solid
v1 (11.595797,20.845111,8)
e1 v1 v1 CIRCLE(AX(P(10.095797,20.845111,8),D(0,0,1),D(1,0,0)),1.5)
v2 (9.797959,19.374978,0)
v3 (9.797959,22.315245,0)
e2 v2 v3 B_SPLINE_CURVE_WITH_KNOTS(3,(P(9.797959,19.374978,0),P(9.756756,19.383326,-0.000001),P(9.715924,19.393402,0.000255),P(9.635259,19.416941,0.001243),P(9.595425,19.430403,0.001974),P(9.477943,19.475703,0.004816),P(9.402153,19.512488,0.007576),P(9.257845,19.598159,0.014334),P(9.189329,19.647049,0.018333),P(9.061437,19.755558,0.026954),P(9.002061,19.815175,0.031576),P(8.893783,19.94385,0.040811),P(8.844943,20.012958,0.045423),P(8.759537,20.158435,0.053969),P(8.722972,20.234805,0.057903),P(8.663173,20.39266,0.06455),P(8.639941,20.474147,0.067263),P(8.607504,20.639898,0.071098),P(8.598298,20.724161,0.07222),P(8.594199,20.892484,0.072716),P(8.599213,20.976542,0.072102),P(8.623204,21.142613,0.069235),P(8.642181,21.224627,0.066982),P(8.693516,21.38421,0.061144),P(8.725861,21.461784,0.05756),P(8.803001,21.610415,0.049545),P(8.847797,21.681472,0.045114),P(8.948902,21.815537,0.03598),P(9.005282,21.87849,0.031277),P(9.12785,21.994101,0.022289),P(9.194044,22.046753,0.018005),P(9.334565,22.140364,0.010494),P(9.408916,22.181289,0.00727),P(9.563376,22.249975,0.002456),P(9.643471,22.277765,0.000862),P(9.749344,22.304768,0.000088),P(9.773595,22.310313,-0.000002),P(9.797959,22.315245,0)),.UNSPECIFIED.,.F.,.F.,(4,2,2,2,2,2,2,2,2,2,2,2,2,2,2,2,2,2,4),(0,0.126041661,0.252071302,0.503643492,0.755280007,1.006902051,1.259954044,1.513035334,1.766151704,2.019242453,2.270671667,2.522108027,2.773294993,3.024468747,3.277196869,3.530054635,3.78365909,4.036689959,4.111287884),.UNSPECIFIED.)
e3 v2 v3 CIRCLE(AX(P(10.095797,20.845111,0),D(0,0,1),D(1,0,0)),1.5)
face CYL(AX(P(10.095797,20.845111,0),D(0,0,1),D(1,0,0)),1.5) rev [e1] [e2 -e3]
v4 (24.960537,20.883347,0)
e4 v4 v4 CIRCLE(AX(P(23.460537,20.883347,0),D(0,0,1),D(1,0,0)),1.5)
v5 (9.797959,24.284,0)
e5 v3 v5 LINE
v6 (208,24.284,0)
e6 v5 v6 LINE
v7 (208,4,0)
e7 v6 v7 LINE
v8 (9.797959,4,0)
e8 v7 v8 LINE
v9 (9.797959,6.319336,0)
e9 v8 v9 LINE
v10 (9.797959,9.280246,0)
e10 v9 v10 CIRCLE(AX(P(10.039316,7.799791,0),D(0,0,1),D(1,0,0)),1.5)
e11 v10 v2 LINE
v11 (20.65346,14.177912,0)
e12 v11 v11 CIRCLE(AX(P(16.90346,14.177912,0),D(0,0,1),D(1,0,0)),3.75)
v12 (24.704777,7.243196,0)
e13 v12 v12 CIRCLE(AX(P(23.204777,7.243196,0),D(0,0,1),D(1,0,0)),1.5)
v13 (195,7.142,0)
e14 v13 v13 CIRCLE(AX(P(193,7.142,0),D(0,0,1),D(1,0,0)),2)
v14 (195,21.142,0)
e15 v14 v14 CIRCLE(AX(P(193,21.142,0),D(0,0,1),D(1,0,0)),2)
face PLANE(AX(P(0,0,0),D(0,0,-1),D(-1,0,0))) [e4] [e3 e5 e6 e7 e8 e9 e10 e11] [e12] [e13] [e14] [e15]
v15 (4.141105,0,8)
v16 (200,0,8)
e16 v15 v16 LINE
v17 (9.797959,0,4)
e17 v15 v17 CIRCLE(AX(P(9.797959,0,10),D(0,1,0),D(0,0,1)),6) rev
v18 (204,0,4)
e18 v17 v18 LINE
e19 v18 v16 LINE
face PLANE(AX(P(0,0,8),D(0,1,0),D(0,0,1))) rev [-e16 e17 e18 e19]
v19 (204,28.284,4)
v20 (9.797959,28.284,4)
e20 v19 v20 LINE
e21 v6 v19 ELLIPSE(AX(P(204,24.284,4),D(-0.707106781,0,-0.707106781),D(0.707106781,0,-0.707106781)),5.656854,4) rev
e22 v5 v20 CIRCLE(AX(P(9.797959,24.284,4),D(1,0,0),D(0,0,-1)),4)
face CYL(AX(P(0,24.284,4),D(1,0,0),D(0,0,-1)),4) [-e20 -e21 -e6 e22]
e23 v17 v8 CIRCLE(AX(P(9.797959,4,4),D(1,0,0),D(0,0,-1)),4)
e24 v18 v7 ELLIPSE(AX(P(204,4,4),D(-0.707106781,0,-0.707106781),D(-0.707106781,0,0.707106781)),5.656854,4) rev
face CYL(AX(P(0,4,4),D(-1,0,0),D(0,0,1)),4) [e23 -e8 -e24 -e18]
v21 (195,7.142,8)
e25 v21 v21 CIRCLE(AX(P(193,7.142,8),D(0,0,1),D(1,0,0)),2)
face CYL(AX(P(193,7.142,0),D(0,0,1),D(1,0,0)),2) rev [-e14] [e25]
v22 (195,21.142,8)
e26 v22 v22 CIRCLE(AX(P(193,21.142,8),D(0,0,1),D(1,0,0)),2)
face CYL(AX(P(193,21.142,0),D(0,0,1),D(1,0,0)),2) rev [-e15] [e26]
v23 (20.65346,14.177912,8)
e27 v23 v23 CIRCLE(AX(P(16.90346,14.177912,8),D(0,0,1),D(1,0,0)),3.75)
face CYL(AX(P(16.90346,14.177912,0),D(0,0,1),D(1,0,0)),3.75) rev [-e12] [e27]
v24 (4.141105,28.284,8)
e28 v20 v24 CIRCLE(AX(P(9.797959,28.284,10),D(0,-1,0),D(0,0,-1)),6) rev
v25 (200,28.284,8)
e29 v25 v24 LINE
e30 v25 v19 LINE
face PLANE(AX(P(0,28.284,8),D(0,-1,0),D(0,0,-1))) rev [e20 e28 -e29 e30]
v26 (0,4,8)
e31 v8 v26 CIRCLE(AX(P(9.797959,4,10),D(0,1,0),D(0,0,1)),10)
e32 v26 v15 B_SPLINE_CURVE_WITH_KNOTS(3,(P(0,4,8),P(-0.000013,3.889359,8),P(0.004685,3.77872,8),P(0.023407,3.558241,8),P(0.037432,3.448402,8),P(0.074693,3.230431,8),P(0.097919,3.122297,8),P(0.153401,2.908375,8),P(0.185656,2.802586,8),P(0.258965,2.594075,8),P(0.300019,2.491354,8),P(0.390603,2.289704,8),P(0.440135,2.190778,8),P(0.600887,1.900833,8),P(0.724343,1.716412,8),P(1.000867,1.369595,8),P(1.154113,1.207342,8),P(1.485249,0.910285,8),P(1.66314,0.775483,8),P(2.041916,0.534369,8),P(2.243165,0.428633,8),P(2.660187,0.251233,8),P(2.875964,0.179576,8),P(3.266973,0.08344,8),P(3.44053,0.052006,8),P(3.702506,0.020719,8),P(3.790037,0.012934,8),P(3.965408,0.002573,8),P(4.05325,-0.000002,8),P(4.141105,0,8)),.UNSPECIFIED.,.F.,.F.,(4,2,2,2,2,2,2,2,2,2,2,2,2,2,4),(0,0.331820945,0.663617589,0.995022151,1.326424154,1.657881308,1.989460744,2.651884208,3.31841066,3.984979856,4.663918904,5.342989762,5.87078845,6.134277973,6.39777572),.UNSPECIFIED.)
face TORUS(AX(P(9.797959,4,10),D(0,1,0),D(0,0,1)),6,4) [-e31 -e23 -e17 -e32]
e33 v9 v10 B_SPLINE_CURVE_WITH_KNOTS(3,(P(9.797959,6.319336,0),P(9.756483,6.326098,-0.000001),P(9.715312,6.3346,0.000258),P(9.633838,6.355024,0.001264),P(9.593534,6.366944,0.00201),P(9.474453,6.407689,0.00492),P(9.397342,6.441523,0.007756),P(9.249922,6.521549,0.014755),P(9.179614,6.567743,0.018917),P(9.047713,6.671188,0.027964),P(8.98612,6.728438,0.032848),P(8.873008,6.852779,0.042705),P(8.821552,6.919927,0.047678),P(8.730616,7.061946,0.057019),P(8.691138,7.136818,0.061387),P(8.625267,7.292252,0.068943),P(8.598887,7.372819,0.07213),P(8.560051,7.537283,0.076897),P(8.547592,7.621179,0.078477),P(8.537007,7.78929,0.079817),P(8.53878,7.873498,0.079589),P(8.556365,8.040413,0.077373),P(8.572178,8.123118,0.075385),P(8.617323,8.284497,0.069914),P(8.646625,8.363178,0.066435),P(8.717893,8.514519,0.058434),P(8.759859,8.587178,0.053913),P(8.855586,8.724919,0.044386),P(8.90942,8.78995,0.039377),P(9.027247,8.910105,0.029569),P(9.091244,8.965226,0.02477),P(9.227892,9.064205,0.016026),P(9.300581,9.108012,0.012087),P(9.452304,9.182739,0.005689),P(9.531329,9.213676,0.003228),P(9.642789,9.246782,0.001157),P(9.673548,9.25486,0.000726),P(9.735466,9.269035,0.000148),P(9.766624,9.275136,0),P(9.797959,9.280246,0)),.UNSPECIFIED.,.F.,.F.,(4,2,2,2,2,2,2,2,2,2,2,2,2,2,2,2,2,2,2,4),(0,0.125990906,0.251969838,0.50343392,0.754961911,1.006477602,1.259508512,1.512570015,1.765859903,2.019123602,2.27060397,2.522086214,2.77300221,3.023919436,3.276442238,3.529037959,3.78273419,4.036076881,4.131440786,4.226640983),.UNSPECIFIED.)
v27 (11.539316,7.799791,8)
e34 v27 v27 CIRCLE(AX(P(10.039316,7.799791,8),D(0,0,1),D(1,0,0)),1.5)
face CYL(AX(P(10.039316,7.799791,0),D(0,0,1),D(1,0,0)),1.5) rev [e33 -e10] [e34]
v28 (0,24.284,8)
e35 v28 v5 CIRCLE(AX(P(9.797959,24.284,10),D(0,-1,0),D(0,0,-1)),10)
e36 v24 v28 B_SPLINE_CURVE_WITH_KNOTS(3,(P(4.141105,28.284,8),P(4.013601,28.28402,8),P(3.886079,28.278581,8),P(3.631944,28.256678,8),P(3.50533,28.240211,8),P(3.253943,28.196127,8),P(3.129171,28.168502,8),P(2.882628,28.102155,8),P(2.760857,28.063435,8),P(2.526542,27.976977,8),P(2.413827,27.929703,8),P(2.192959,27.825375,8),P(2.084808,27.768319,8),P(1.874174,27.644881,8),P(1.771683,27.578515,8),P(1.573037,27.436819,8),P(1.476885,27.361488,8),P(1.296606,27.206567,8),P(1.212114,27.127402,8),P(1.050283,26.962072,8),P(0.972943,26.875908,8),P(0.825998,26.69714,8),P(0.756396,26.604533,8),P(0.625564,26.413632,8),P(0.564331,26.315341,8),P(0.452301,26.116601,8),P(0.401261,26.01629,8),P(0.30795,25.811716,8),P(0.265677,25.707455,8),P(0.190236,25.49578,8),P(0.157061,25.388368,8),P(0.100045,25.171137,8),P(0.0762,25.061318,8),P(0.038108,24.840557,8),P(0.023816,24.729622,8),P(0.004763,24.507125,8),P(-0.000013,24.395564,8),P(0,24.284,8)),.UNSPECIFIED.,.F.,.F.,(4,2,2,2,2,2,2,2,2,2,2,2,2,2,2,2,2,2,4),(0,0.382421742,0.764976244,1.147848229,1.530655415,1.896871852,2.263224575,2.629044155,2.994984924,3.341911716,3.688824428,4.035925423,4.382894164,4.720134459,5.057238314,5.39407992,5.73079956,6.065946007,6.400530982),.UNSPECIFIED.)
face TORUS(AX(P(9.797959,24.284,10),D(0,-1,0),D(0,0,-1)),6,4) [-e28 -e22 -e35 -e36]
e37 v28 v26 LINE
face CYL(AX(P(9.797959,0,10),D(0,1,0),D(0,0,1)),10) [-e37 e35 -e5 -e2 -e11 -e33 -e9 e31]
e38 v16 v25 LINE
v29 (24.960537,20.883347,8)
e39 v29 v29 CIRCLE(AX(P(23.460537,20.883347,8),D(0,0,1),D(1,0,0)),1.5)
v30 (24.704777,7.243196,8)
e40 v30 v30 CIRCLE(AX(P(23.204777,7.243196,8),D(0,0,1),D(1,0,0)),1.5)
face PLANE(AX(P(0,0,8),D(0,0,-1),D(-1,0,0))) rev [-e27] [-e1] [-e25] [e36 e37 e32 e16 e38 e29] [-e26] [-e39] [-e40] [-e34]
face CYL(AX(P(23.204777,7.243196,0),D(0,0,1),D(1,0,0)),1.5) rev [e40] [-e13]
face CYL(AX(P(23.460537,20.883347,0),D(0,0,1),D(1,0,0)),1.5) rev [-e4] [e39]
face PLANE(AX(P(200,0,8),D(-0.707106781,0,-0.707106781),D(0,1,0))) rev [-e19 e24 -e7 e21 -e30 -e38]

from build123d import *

# Parameters (mm, degrees)
ESQUISSE1_W             = 220
ESQUISSE1_H             = 28.284
BOSS_EXTRU_3_DEPTH      = 8
CHANFREIN1_SIZE         = 20
ESQUISSE4_R             = 2
ENL_V_MAT_EXTRU_1_DEPTH = 8
FILLET1_R               = 10
SKETCH2_R               = 1.5
SKETCH2_R_2             = 3.75
CUT_EXTRUDE1_DEPTH      = 8
FILLET4_R               = 4
FILLET5_R               = 4


with BuildPart() as part:
    # Esquisse1 → Boss.-Extru.3 (new body)
    with BuildSketch(Plane.XY):
        with Locations((110, 14.142)):
            Rectangle(ESQUISSE1_W, ESQUISSE1_H)
    extrude(amount=BOSS_EXTRU_3_DEPTH)

    # Chanfrein1
    # the kernel refuses this chamfer: 20 mm, written as the material it takes off along each edge
    with BuildSketch(Plane(origin=(220, -51.433659759, 8), x_dir=(0.027495876610586317, 0, -0.9996219169112968), z_dir=(0, 1, 0))) as chanfrein1_piece_1:
        Polygon((CHANFREIN1_SIZE * 0.999621916911, CHANFREIN1_SIZE * 0.0274958766106), (-CHANFREIN1_SIZE * 0.0274958766106, CHANFREIN1_SIZE * 0.999621916911), (0, 0), align=None)
    extrude(amount=131.151319519, mode=Mode.SUBTRACT)

    # Esquisse4 → Enlèv. mat.-Extru.1 (cut)
    with BuildSketch(Plane.XY.offset(8)):
        with Locations((193, 7.142)):
            Circle(ESQUISSE4_R)
        with Locations((193, 21.142)):
            Circle(ESQUISSE4_R)
    extrude(amount=-ENL_V_MAT_EXTRU_1_DEPTH, mode=Mode.SUBTRACT)

    # Fillet1
    # the kernel refuses this fillet: 10 mm, written as the material it takes off along each edge
    with BuildSketch(Plane(origin=(0, 52.778897428, 0), x_dir=(1, 0, 0), z_dir=(0, -1, 0))) as fillet1_piece_1:
        with BuildLine():
            CenterArc((9.797958971, 10), FILLET1_R, 191.536959033, 78.463040967)
            Line((0, 8), (-0.195959179, 7.96))
            ThreePointArc((-0.195959179, 7.96), (-0.2, 4), (-0.2, 0))
            Line((-0.2, 0), (0, -0.2))
            Line((0, -0.2), (9.797958971, -0.2))
            Line((9.797958971, -0.2), (9.797958971, 0))
        make_face()
    extrude(amount=77.273794856, mode=Mode.SUBTRACT)

    # Sketch2 → Cut-Extrude1 (cut)
    with BuildSketch(Plane.XY.offset(8)):
        with Locations((10.039316358, 7.799790773)):
            Circle(SKETCH2_R)
        with Locations((10.095797266, 20.845111475)):
            Circle(SKETCH2_R)
        with Locations((23.204777475, 7.243195633)):
            Circle(SKETCH2_R)
        with Locations((23.460536656, 20.883346587)):
            Circle(SKETCH2_R)
        with Locations((16.903459812, 14.177912334)):
            Circle(SKETCH2_R_2)
    extrude(amount=-CUT_EXTRUDE1_DEPTH, mode=Mode.SUBTRACT)

    # Fillet4
    fillet4_edges = [part.edges().sort_by_distance(p)[0] for p in [
        (108.898979486, 0, 0),
        (3.473403651, 0, 2.254033308),
    ]]
    fillet(fillet4_edges, radius=FILLET4_R)

    # Fillet5
    fillet5_edges = [part.edges().sort_by_distance(p)[0] for p in [
        (108.898979486, 28.284, 0),
        (3.473403651, 28.284, 2.254033308),
    ]]
    fillet(fillet5_edges, radius=FILLET5_R)


solid = part.part
